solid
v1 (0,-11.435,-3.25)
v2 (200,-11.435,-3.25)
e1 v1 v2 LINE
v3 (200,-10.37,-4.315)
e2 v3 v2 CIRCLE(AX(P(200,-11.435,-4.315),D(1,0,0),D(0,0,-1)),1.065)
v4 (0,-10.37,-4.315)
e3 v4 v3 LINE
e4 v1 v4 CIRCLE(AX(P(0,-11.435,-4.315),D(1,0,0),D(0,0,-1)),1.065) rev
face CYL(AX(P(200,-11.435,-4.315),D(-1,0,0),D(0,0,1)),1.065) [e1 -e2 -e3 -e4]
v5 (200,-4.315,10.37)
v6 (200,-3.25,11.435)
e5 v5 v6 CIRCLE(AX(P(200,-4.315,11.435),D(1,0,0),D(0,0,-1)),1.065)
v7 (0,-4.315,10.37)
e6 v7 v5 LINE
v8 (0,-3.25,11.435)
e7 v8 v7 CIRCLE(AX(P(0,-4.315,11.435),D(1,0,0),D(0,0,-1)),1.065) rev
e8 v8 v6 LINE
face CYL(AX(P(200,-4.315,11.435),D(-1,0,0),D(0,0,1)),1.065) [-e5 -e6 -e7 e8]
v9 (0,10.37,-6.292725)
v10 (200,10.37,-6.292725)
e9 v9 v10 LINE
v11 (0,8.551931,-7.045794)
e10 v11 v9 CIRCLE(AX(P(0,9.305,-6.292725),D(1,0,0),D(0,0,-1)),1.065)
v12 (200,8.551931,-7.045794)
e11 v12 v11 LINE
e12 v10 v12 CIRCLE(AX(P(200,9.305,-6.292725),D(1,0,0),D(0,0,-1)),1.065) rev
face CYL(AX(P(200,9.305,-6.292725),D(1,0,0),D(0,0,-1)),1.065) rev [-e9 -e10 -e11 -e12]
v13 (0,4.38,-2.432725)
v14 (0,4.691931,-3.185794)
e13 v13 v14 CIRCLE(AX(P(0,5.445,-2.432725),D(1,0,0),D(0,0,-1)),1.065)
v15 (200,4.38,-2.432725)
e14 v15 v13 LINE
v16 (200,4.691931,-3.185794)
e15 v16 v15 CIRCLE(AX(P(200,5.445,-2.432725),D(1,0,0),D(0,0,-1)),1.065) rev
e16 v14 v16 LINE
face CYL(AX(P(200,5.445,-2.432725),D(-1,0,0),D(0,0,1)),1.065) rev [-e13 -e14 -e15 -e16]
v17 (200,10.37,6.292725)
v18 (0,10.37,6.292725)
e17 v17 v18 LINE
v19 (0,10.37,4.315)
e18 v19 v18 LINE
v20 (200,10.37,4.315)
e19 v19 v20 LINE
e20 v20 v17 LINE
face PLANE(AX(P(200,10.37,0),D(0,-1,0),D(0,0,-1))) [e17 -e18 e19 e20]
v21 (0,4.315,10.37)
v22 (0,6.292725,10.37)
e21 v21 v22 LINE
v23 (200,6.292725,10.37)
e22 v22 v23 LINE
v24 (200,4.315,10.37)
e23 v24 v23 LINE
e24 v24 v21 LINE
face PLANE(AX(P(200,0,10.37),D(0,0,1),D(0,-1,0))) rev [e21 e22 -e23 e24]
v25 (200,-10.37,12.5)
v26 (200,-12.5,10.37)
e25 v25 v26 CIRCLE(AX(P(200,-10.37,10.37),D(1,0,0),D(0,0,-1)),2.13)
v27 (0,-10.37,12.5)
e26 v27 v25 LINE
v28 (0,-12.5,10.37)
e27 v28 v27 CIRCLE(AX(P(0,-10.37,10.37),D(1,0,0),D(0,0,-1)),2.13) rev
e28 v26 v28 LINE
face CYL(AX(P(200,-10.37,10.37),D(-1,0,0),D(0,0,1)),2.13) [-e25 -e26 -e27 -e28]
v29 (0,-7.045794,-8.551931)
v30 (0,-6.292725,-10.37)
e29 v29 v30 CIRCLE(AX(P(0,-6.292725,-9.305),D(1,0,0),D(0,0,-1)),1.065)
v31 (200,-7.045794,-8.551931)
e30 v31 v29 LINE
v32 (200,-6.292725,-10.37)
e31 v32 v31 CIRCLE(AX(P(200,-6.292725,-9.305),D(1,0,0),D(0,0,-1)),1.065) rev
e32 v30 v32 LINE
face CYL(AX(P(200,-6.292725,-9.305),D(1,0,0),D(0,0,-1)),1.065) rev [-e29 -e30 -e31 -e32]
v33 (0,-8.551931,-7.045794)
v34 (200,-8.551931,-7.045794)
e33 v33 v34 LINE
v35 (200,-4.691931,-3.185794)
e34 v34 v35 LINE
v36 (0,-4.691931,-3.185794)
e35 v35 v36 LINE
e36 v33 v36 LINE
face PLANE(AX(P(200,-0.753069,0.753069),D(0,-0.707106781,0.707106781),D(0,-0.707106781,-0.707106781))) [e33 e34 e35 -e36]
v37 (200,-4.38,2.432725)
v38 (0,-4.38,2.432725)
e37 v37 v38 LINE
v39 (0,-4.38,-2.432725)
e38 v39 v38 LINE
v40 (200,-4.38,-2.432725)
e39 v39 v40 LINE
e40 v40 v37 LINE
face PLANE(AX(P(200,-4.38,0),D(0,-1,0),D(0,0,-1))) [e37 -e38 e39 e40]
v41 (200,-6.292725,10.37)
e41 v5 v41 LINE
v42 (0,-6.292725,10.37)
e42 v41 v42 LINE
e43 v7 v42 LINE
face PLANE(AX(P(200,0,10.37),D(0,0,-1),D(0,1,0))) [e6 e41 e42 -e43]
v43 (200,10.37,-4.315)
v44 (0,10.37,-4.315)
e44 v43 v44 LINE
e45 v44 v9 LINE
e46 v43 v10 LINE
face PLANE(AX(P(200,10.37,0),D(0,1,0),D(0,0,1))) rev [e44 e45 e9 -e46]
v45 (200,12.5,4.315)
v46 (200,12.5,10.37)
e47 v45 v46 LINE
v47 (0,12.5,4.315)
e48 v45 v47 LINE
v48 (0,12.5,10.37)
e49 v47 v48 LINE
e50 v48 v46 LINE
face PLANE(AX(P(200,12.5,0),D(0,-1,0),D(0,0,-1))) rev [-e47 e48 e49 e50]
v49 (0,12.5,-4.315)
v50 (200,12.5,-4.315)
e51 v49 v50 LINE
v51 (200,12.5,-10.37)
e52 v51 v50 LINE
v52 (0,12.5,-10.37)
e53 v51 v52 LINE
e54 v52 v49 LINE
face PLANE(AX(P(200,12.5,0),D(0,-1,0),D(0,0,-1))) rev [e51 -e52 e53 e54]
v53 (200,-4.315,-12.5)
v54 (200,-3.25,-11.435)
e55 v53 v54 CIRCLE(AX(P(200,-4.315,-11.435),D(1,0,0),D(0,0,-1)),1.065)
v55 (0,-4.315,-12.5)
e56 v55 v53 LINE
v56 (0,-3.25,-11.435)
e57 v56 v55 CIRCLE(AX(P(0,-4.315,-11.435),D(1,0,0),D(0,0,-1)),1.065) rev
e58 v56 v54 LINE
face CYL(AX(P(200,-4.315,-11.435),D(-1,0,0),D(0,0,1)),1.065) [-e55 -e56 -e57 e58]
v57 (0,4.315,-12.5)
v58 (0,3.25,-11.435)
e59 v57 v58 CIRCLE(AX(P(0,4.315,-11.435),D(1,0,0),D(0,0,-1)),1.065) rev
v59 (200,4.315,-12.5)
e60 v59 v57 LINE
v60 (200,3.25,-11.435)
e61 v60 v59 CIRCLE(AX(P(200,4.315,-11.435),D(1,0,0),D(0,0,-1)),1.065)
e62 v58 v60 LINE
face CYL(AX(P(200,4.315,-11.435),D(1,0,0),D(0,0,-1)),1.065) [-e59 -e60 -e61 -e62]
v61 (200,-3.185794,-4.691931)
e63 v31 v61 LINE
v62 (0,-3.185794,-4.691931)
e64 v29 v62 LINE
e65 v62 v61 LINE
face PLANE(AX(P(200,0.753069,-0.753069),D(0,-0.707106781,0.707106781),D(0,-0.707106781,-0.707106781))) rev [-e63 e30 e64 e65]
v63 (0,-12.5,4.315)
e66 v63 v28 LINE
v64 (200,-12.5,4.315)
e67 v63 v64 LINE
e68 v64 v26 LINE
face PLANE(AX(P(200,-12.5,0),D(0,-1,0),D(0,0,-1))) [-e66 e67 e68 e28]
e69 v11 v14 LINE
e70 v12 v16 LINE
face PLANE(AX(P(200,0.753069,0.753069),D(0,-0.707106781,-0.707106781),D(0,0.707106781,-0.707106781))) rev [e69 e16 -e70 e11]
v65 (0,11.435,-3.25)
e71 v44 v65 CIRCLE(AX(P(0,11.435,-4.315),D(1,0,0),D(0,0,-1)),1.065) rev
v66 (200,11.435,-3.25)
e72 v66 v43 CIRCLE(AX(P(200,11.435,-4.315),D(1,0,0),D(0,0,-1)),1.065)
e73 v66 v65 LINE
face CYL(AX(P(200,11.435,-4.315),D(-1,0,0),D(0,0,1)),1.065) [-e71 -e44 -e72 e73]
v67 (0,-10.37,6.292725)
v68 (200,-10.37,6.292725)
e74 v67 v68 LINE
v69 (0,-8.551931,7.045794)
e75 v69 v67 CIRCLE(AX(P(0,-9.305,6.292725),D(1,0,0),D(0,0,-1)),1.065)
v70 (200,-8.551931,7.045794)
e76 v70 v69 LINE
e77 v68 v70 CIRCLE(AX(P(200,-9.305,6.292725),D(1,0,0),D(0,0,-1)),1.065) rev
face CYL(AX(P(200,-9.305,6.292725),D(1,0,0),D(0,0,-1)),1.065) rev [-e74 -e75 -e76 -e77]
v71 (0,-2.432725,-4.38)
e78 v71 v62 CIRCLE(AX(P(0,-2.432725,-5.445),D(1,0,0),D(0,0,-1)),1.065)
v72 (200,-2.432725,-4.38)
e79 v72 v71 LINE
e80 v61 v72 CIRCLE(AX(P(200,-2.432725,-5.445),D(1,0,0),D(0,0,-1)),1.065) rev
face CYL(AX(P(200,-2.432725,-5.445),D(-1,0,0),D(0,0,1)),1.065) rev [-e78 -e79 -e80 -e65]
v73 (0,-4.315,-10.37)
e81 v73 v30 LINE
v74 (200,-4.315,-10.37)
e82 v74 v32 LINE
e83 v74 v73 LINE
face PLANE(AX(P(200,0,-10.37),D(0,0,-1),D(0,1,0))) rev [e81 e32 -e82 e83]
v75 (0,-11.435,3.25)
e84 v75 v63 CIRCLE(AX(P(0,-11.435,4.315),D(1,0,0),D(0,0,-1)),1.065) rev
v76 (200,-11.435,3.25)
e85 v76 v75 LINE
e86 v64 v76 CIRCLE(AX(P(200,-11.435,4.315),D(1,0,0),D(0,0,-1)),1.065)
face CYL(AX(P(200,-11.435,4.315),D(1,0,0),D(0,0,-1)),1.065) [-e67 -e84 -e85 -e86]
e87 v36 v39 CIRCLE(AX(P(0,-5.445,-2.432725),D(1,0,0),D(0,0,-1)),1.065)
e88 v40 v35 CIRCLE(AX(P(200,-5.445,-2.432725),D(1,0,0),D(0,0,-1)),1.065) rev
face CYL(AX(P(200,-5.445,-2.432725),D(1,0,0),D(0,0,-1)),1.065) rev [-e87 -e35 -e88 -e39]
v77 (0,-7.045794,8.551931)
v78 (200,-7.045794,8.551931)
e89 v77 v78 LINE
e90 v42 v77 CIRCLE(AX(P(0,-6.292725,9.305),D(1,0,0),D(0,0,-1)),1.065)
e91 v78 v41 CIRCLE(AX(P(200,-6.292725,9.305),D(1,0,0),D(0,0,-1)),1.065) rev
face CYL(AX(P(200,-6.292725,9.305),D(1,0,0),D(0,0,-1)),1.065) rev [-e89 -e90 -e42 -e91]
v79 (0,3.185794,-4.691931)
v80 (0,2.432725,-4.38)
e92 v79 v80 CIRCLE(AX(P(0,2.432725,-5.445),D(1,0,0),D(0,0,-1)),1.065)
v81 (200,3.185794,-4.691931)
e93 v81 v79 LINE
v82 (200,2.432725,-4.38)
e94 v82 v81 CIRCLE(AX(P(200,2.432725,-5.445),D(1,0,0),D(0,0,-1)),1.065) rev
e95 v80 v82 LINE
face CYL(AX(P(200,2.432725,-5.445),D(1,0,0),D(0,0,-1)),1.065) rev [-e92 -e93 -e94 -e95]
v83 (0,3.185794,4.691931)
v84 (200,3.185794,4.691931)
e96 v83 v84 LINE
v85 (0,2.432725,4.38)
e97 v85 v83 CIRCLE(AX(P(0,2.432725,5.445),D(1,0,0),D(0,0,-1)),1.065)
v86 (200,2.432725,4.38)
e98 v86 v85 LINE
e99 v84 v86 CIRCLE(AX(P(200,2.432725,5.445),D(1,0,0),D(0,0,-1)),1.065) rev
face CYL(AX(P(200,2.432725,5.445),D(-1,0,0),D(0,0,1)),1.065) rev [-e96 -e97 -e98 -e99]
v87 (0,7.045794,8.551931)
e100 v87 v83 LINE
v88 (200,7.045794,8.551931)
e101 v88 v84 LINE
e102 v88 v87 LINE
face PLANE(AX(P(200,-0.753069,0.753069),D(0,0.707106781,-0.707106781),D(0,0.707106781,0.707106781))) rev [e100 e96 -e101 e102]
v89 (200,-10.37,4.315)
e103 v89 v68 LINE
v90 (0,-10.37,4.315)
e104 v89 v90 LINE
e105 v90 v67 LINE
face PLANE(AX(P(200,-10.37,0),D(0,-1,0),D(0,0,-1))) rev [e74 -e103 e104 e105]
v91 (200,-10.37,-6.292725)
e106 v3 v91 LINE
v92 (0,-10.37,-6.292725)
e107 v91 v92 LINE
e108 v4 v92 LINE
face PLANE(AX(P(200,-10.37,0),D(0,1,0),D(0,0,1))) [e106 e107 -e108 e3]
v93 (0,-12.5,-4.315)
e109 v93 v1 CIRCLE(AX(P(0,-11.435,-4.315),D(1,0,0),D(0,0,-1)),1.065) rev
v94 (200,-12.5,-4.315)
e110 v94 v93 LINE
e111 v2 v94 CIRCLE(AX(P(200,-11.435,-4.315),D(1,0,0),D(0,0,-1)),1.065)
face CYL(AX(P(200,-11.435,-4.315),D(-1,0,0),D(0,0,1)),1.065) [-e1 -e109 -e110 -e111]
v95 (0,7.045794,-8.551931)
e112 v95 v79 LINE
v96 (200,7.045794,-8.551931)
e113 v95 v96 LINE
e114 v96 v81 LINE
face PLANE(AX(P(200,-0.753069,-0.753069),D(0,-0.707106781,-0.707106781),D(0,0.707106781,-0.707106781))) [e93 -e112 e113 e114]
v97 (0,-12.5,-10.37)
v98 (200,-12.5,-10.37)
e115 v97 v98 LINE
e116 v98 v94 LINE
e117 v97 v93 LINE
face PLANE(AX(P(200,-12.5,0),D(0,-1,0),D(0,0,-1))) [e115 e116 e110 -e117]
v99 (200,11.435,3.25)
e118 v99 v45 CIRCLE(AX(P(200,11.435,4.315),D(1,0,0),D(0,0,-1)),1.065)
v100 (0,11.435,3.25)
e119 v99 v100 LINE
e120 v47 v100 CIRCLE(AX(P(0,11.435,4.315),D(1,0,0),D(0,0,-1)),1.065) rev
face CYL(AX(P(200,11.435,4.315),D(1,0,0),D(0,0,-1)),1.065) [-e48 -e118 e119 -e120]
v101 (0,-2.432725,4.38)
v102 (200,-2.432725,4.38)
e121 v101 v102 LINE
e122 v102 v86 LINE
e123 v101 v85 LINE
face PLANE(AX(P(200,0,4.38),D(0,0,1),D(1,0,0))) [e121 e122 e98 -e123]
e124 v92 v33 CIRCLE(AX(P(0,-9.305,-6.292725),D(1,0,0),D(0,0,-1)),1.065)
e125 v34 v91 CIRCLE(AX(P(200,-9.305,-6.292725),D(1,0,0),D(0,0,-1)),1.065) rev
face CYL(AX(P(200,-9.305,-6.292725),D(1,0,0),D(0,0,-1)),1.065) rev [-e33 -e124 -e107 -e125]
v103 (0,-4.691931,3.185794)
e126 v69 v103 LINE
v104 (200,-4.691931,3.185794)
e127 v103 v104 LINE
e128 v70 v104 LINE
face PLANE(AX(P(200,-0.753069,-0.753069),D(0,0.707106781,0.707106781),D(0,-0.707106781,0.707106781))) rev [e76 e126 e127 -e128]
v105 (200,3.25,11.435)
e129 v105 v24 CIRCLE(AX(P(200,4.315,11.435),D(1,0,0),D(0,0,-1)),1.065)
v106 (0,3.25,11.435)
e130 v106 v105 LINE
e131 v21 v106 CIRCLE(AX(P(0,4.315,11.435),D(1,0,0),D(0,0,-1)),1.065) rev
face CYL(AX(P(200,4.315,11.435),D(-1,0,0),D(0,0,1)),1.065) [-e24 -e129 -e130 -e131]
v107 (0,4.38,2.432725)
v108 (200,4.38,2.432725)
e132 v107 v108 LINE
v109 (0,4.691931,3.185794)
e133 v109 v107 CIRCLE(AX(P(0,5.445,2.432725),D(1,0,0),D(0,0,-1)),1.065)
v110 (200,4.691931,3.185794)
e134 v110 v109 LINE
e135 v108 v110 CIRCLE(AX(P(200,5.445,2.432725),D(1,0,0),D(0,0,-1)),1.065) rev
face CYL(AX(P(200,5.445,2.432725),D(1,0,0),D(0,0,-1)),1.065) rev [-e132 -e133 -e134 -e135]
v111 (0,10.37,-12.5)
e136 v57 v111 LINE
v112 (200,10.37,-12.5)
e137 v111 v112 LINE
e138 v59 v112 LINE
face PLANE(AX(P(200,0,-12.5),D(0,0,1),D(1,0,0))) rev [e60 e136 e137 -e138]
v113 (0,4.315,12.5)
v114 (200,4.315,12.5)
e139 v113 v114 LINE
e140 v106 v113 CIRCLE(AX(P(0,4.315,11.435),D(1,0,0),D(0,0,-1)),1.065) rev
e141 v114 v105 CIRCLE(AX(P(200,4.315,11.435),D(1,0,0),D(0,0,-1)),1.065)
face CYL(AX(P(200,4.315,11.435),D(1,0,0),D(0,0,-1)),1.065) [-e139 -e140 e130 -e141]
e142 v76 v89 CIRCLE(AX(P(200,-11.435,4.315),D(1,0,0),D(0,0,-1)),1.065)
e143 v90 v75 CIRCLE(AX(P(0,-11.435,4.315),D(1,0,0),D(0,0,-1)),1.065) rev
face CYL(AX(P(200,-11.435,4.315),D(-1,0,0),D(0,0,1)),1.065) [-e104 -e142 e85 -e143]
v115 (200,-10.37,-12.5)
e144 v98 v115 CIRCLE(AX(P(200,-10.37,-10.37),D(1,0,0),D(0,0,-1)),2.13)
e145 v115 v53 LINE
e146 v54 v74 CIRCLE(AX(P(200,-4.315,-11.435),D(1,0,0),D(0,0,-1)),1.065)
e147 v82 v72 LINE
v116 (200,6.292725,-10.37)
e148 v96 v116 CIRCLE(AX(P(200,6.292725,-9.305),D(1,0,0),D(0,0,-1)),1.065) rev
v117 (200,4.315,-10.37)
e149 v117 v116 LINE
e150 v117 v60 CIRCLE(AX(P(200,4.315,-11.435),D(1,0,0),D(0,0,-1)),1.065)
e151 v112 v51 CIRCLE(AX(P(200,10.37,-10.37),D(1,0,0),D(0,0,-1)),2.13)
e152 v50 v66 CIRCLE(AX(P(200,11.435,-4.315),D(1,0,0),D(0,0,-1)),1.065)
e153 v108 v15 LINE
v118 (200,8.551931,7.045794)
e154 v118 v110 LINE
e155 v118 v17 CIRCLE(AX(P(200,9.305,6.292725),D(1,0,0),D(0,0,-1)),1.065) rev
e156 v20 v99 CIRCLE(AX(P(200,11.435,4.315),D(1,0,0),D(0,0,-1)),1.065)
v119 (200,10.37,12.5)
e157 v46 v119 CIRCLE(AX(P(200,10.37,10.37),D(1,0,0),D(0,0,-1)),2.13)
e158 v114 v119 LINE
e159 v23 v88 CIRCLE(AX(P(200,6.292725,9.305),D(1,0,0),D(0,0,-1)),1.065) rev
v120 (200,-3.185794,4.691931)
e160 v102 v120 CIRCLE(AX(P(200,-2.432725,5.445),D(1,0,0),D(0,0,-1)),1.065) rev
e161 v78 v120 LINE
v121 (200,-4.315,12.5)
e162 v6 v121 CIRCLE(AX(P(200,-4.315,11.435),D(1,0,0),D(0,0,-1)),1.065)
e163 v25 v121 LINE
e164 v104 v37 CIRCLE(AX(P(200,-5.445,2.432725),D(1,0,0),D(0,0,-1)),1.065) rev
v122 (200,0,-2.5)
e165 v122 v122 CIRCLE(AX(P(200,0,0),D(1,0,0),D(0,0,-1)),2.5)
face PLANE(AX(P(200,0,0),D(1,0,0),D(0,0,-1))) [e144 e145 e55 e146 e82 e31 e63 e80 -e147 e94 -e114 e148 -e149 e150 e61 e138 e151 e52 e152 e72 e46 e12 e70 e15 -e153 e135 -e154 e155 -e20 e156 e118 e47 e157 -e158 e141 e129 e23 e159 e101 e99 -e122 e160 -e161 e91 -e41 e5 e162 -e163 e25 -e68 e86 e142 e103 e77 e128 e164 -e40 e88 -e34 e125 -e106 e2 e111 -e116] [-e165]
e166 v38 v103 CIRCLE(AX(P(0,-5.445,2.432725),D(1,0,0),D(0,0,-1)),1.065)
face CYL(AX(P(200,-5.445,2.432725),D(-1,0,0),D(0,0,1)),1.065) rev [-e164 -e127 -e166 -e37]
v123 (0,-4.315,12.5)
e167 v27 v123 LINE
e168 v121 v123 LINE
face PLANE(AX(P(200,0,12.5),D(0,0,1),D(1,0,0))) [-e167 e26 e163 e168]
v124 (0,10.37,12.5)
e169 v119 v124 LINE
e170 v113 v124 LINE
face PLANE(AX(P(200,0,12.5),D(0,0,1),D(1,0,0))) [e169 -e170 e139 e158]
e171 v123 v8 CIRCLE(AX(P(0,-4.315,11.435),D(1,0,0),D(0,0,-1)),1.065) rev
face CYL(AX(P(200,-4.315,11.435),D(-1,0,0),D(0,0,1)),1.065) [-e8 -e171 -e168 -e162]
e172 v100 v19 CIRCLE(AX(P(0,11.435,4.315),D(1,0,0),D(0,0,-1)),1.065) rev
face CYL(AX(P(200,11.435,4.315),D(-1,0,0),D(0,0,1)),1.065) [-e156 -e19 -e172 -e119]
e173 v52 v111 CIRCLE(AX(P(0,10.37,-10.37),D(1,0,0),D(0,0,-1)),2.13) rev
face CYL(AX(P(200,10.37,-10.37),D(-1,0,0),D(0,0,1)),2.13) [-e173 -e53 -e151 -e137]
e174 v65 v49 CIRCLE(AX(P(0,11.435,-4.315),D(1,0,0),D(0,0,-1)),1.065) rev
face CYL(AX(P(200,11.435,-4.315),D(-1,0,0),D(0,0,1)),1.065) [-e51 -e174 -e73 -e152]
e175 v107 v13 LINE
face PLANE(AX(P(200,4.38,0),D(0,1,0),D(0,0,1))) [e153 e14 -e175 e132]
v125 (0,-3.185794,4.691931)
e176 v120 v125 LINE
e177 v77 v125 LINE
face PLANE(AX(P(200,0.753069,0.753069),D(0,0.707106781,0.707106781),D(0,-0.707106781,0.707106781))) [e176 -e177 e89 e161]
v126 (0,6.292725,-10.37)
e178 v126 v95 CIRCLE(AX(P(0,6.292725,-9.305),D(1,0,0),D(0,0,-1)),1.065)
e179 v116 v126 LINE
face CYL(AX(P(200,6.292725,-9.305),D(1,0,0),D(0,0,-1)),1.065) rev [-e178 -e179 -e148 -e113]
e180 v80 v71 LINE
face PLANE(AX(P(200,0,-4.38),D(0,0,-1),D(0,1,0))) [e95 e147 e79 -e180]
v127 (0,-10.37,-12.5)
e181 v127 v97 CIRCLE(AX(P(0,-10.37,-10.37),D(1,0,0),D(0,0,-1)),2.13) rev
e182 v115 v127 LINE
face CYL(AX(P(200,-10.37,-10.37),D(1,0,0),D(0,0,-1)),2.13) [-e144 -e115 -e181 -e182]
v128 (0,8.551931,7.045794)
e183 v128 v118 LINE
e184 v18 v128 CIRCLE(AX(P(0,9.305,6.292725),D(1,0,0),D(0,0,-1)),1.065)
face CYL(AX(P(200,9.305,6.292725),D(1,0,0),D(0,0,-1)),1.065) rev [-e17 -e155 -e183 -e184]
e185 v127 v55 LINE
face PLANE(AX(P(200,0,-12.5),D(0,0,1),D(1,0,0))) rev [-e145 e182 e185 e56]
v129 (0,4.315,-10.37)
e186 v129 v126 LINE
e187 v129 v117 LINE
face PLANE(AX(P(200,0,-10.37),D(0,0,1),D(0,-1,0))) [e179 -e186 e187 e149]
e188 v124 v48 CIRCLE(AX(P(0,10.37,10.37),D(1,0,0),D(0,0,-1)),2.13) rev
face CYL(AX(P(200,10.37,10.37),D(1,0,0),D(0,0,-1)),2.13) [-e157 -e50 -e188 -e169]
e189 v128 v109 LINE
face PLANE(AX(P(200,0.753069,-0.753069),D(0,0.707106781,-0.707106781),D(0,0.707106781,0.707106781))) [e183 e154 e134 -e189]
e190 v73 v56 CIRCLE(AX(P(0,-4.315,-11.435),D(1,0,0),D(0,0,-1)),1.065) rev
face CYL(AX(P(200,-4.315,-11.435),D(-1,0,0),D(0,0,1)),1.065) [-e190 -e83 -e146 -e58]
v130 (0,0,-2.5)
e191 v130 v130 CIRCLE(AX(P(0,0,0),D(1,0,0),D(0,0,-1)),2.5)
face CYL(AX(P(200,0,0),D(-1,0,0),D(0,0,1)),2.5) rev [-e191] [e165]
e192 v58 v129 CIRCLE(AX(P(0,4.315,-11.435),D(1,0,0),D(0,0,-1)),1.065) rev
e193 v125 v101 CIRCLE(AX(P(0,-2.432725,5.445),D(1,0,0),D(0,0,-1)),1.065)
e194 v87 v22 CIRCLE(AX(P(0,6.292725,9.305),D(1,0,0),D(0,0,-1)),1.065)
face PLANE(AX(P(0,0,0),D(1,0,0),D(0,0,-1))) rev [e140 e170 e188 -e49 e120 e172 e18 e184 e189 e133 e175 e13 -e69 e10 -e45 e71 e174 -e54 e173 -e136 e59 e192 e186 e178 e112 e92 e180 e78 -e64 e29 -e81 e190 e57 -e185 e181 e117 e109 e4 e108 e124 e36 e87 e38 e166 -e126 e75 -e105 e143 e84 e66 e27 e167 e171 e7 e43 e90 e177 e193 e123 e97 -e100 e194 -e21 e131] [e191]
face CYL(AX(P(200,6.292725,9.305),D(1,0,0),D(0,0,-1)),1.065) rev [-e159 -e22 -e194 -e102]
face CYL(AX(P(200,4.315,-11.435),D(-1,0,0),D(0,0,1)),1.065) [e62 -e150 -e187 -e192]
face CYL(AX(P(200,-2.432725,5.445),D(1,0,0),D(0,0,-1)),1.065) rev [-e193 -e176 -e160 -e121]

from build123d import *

# Parameters (mm, degrees)
SKETCH1_R           = 2.5
BOSS_EXTRUDE1_DEPTH = 200
FILLET1_R           = 1.065
FILLET2_R           = 2.13


with BuildPart() as part:
    # Sketch1 → Boss-Extrude1 (new body)
    with BuildSketch(Plane.YZ):
        Polygon((-12.5, -3.25), (-12.5, -12.5), (-3.25, -12.5), (-3.25, -10.37), (-8.863862556, -10.37), (-2.873862556, -4.38), (2.873862556, -4.38), (8.863862556, -10.37), (3.25, -10.37), (3.25, -12.5), (12.5, -12.5), (12.5, -3.25), (10.37, -3.25), (10.37, -8.863862556), (4.38, -2.873862556), (4.38, 2.873862556), (10.37, 8.863862556), (10.37, 3.25), (12.5, 3.25), (12.5, 12.5), (3.25, 12.5), (3.25, 10.37), (8.863862556, 10.37), (2.873862556, 4.38), (-2.873862556, 4.38), (-8.863862556, 10.37), (-3.25, 10.37), (-3.25, 12.5), (-12.5, 12.5), (-12.5, 3.25), (-10.37, 3.25), (-10.37, 8.863862556), (-4.38, 2.873862556), (-4.38, -2.873862556), (-10.37, -8.863862556), (-10.37, -3.25), align=None)
        with Locations(Location((0, 0, 0), (0, 0, 270))):
            Circle(SKETCH1_R, mode=Mode.SUBTRACT)
    extrude(amount=BOSS_EXTRUDE1_DEPTH)

    # Fillet1
    fillet1_edges = [part.edges().sort_by_distance(p)[0] for p in [
        (100, -10.37, -8.863862556),
        (100, 2.873862556, -4.38),
        (100, -2.873862556, -4.38),
        (100, -4.38, 2.873862556),
        (100, -4.38, -2.873862556),
        (100, -2.873862556, 4.38),
        (100, 2.873862556, 4.38),
        (100, 4.38, 2.873862556),
        (100, 4.38, -2.873862556),
        (100, -8.863862556, -10.37),
        (100, 8.863862556, -10.37),
        (100, 10.37, -8.863862556),
        (100, -10.37, 8.863862556),
        (100, -8.863862556, 10.37),
        (100, 10.37, 8.863862556),
        (100, 8.863862556, 10.37),
        (100, 12.5, 3.25),
        (100, -3.25, -12.5),
        (100, -10.37, 3.25),
        (100, 10.37, 3.25),
        (100, -10.37, -3.25),
        (100, -12.5, -3.25),
        (100, -12.5, 3.25),
        (100, 3.25, -10.37),
        (100, -3.25, -10.37),
        (100, 3.25, -12.5),
        (100, 10.37, -3.25),
        (100, 12.5, -3.25),
        (100, 3.25, 12.5),
        (100, 3.25, 10.37),
        (100, -3.25, 10.37),
        (100, -3.25, 12.5),
    ]]
    fillet(fillet1_edges, radius=FILLET1_R - 0.0001)  # a hair under: the kernel refuses the full size

    # Fillet2
    fillet2_edges = [part.edges().sort_by_distance(p)[0] for p in [
        (100, -12.5, 12.5),
        (100, 12.5, 12.5),
        (100, 12.5, -12.5),
        (100, -12.5, -12.5),
    ]]
    fillet(fillet2_edges, radius=FILLET2_R)


solid = part.part
